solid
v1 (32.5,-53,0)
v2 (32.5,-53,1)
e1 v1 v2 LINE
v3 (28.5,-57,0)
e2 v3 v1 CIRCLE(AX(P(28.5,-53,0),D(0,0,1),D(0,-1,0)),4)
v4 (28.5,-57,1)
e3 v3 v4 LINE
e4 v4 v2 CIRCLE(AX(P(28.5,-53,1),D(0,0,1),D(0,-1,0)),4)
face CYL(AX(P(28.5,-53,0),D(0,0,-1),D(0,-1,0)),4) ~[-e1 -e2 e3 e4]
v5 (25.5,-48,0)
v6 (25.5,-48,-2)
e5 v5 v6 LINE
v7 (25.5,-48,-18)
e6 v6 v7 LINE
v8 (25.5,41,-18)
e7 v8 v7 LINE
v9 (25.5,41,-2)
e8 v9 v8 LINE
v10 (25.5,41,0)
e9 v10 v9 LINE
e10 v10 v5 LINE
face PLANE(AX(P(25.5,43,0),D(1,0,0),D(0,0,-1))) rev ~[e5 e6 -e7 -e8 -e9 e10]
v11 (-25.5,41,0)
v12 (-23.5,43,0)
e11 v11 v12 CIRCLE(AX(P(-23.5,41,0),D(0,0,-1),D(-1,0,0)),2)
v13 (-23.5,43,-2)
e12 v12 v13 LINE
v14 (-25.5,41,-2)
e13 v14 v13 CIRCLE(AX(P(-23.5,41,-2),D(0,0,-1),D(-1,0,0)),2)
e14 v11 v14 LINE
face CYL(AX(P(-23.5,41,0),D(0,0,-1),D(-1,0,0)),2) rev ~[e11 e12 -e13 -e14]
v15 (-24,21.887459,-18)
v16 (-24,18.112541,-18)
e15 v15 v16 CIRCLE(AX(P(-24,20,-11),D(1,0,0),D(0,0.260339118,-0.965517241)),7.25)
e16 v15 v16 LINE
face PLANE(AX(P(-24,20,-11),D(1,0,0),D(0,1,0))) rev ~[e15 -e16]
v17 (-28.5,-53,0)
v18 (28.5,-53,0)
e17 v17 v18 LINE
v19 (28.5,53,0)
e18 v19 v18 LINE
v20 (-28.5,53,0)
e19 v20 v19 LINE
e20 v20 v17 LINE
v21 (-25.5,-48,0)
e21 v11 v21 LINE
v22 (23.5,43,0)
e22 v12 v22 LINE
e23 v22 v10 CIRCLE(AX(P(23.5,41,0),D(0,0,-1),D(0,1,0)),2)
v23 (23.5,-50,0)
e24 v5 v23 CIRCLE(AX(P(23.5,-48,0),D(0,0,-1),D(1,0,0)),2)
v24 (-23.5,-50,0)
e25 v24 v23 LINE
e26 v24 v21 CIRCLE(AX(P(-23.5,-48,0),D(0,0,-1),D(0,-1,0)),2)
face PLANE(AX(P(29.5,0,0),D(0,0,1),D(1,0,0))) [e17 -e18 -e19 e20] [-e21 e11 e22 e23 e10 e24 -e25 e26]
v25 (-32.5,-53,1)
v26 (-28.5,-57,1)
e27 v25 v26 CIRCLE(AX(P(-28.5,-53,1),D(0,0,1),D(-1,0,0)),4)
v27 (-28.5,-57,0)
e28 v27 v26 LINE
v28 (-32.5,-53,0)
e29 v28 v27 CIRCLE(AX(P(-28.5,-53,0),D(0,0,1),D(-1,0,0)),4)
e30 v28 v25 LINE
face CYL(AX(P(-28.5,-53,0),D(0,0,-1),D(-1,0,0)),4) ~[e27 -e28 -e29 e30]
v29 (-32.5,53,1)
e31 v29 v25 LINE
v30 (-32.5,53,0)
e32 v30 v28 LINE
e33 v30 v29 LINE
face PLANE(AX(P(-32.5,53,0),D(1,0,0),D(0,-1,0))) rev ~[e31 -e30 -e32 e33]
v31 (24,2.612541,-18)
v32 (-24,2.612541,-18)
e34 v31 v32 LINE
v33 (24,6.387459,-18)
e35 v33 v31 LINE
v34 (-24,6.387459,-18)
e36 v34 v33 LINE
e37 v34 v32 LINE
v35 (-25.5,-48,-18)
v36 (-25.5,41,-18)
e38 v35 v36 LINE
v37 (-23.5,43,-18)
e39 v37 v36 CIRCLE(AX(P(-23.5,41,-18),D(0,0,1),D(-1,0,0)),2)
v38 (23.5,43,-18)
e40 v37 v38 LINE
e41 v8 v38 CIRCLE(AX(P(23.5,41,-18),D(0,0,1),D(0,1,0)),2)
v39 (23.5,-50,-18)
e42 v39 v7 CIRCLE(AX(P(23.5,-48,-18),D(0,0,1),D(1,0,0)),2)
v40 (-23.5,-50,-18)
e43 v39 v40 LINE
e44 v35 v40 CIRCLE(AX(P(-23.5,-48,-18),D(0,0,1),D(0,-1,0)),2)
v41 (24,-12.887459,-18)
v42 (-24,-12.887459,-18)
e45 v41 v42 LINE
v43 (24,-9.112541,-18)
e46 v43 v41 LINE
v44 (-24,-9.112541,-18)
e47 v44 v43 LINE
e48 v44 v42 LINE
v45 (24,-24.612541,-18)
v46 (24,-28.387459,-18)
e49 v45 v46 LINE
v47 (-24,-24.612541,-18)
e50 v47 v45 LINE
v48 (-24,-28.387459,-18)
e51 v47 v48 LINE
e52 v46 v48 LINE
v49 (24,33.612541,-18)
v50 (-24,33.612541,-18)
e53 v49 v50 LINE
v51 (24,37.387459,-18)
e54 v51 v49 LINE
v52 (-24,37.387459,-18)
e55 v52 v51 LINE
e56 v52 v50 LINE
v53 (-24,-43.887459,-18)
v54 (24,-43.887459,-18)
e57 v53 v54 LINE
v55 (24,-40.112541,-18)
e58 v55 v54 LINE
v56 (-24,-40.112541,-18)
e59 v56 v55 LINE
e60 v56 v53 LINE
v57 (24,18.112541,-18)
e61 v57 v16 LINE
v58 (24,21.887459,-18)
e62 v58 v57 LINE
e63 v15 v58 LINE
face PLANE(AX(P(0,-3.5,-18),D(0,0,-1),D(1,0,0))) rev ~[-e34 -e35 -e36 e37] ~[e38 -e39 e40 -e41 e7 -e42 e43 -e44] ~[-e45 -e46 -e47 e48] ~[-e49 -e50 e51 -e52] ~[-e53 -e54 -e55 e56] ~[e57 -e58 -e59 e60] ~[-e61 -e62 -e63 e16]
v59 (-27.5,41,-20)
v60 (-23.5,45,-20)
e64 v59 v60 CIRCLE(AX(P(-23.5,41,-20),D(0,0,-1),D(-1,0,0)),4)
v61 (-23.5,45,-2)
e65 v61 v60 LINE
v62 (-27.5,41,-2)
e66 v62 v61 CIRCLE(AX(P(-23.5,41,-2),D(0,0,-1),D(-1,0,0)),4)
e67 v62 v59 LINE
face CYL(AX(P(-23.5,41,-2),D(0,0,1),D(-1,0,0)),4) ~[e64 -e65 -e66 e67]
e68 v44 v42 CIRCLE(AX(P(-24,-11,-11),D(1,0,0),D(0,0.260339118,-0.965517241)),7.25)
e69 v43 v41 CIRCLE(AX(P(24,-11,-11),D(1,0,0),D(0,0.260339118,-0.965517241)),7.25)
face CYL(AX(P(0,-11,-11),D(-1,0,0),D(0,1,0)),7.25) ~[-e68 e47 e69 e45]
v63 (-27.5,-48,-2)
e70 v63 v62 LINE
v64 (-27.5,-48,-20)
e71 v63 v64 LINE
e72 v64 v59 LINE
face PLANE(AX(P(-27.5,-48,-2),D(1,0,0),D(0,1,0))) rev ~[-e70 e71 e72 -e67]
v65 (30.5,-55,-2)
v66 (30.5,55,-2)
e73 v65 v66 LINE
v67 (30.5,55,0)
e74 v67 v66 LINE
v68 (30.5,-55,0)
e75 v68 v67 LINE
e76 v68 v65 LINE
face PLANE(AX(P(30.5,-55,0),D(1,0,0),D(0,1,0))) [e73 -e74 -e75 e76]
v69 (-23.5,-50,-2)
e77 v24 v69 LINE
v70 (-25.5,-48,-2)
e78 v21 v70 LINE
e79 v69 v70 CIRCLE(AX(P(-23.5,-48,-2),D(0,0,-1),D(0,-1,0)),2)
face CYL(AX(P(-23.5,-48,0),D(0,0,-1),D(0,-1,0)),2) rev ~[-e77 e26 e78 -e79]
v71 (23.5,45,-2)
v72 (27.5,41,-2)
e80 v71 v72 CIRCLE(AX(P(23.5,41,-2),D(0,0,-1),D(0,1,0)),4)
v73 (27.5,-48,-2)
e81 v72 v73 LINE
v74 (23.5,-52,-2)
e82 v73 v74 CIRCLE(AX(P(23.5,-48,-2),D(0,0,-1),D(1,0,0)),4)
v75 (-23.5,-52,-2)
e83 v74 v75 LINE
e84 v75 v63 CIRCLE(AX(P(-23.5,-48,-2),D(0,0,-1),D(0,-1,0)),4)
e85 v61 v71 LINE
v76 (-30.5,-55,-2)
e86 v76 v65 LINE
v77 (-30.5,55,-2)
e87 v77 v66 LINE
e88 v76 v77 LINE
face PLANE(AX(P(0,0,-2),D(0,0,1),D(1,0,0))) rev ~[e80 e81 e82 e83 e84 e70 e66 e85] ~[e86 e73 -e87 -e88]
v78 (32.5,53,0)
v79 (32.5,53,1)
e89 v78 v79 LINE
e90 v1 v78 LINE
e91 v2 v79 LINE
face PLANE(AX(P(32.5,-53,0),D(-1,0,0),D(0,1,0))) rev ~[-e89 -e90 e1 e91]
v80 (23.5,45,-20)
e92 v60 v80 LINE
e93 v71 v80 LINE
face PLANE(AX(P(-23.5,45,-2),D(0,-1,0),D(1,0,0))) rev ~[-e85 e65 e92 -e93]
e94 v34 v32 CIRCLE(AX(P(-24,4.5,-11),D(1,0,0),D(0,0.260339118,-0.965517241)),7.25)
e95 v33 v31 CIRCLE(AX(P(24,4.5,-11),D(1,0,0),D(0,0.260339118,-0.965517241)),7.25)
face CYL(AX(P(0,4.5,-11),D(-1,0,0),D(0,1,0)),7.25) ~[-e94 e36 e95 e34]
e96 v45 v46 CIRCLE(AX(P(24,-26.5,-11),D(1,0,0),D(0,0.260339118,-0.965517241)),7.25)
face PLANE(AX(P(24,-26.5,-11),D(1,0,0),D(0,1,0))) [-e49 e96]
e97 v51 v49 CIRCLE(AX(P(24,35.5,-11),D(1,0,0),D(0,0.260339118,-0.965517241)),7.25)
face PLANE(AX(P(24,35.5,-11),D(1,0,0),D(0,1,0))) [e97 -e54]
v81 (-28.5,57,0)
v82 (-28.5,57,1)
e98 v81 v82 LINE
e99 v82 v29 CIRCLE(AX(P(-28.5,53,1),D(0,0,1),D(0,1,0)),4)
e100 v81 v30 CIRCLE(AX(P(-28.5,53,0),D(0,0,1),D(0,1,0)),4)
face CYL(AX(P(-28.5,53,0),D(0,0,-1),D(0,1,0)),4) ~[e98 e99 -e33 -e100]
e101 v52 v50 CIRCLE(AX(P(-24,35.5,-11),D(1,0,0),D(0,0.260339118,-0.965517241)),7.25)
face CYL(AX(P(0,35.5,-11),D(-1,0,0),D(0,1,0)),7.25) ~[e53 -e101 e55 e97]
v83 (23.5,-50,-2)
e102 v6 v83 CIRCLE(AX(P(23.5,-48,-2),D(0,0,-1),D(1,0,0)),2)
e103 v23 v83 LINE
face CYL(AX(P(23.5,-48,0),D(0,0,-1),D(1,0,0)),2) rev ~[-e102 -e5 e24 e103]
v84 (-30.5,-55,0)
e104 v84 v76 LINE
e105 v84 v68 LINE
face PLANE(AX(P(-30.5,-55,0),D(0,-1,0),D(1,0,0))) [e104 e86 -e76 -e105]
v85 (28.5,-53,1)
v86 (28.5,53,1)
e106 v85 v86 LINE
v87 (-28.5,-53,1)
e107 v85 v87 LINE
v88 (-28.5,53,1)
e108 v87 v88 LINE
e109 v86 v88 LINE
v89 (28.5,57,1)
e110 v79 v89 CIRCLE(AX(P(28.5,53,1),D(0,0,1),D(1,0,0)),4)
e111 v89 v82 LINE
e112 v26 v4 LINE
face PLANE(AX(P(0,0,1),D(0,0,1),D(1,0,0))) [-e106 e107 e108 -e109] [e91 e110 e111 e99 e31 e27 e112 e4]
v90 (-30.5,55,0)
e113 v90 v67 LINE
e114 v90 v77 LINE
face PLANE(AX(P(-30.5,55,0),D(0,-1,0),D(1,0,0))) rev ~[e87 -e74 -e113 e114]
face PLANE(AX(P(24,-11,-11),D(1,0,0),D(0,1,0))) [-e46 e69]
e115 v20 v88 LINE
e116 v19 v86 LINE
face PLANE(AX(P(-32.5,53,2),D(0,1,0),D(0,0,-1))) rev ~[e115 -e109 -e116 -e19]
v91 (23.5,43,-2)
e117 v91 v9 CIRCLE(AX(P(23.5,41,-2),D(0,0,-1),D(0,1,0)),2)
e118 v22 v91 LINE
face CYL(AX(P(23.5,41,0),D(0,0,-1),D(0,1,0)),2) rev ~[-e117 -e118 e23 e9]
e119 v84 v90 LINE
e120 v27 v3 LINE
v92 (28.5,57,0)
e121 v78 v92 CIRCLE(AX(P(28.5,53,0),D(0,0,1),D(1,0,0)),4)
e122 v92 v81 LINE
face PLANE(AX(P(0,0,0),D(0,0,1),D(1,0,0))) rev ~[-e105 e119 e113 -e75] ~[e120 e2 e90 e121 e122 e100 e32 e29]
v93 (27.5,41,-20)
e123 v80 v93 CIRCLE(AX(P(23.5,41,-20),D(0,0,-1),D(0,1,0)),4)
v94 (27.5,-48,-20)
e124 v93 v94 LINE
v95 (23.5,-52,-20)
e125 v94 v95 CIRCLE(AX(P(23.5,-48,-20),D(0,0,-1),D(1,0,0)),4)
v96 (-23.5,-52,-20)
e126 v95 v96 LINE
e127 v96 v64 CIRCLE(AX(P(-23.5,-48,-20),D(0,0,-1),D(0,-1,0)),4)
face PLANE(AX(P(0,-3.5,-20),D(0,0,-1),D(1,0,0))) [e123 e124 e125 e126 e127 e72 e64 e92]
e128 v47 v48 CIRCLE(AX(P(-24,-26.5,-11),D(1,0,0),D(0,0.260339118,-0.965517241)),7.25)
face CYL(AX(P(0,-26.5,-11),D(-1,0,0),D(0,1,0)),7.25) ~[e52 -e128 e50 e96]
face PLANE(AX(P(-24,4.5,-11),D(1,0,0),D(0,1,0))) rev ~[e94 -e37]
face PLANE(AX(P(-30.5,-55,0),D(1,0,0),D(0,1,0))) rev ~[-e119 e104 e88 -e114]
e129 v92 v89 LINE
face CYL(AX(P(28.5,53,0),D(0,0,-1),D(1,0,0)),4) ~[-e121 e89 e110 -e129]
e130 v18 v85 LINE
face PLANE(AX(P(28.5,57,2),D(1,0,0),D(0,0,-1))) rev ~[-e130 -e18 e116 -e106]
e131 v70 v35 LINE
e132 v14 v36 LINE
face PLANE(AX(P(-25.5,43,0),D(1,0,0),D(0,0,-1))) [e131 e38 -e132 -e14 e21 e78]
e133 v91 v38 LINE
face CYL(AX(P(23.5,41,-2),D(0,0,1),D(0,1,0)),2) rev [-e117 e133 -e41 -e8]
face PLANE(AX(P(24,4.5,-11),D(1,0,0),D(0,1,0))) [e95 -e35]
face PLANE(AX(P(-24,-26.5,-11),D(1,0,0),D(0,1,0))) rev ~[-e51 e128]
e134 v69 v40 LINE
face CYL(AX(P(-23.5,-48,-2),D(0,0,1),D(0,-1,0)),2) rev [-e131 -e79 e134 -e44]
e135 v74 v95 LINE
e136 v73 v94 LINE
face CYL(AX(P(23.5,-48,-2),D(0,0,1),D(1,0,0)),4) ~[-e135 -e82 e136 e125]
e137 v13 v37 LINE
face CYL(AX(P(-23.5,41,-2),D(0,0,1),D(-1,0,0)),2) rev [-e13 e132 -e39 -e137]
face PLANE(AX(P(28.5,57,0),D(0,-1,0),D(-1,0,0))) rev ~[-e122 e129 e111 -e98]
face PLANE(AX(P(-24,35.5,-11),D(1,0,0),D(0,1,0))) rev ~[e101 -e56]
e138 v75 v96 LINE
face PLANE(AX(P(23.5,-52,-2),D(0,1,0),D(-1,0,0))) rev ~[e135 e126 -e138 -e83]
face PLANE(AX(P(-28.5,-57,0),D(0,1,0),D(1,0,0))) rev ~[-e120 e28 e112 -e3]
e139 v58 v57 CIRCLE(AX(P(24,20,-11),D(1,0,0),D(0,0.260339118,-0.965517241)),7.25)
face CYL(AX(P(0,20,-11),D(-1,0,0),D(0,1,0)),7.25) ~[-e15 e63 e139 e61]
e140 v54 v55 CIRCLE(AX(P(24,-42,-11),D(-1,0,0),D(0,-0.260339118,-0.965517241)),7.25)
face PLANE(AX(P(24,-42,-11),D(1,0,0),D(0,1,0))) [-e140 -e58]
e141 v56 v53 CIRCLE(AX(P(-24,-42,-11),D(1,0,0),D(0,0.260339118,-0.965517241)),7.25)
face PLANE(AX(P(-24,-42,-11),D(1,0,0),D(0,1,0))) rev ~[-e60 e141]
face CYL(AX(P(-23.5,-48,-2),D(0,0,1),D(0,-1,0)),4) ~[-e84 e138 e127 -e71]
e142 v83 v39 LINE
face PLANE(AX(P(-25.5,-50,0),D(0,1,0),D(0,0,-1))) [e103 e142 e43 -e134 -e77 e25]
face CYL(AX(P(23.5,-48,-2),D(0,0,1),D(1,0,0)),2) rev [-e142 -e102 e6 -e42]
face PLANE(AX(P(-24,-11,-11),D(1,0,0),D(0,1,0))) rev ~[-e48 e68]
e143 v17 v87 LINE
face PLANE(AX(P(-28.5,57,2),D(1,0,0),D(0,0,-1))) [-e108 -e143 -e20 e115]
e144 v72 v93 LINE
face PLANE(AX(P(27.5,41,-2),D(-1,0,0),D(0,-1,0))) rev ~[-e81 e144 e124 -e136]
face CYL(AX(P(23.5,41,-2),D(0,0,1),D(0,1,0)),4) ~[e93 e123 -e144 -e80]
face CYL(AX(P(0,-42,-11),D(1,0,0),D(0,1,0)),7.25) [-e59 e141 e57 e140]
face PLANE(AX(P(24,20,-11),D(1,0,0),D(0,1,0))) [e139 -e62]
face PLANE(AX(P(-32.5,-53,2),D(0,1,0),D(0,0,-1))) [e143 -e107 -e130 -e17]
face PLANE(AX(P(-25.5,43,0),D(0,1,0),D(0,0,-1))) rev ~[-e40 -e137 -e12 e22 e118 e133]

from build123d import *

# Parameters (mm, degrees)
F1_DEPTH     = 1
F2_W         = 61
F2_H         = 110
F3_DEPTH     = 2
F5_DEPTH     = 18
F6_T         = 2
F6_T3_DEPTH  = 114
F6_T5_DEPTH  = 65
F6_T7_DEPTH  = 51
F6_T9_DEPTH  = 93
F6_T12_ANGLE = 90.000000001
F6_T14_ANGLE = 90.000000001
F6_T16_ANGLE = 90.000000001
F6_T18_ANGLE = 90.000000001
F7_R         = 7.25
F8_DEPTH     = 24


# Not quite as in the source:
# - a shell that OpenCascade refuses in one call is made with other operations: the cavity is built on its own and cut out


with BuildPart() as f1:
    # F0 (on Top) → F1 (new body)
    with BuildSketch(Plane.XY):
        with BuildLine():
            ThreePointArc((32.5, 53), (31.3284271247, 55.8284271247), (28.5, 57))
            Line((28.5, 57), (-28.5, 57))
            ThreePointArc((-28.5, 57), (-31.3284271247, 55.8284271247), (-32.5, 53))
            Line((-32.5, 53), (-32.5, -53))
            ThreePointArc((-32.5, -53), (-31.3284271247, -55.8284271247), (-28.5, -57))
            Line((-28.5, -57), (28.5, -57))
            ThreePointArc((28.5, -57), (31.3284271247, -55.8284271247), (32.5, -53))
            Line((32.5, -53), (32.5, 53))
        make_face()
    extrude(amount=F1_DEPTH)

    # F2 (on Top) → F3 (join)
    with BuildSketch(Plane.XY):
        Rectangle(F2_W, F2_H)
    extrude(amount=-F3_DEPTH)

    # F4 (on face) → F5 (join)
    with BuildSketch(Plane(origin=(0, 0, -2), x_dir=(1, 0, 0), z_dir=(0, 0, -1))):
        with BuildLine():
            Line((23.5, 52), (-23.5, 52))
            ThreePointArc((-23.5, 52), (-26.3284271247, 50.8284271247), (-27.5, 48))
            Line((-27.5, 48), (-27.5, -41))
            ThreePointArc((-27.5, -41), (-26.3284271247, -43.8284271247), (-23.5, -45))
            Line((-23.5, -45), (23.5, -45))
            ThreePointArc((23.5, -45), (26.3284271247, -43.8284271247), (27.5, -41))
            Line((27.5, -41), (27.5, 48))
            ThreePointArc((27.5, 48), (26.3284271247, 50.8284271247), (23.5, 52))
        make_face()
    extrude(amount=F5_DEPTH)

    # F6: shell of thickness 2, made by hand


with BuildPart() as f6_core1:
    # F6_t2: copy of F1
    add(f1.part)

    # the walls: a layer under each face that stays
    f6_faces = [f6_core1.faces().sort_by_distance(p)[0] for p in [
        (31.3284271247, 55.8284271247, 0.5),
        (32.5, 0, 0.5),
        (0, 57, 0.5),
        (22.34375, -55.5925925926, 0),
        (31.3284271247, -55.8284271247, 0.5),
        (-31.3284271247, 55.8284271247, 0.5),
        (0, -57, 0.5),
        (-32.5, 0, 0.5),
        (-31.3284271247, -55.8284271247, 0.5),
        (30.5, 0, -1),
        (0, 55, -1),
        (-30.5, 0, -1),
        (0, -55, -1),
        (-26.1428571429, 47.1428571429, -2),
        (26.3284271247, 43.8284271247, -11),
        (0, 45, -11),
        (-26.3284271247, 43.8284271247, -11),
        (-27.5, -3.5, -11),
        (-26.3284271247, -50.8284271247, -11),
        (0, -52, -11),
        (26.3284271247, -50.8284271247, -11),
        (27.5, -3.5, -11),
        (0, -3.5, -20),
    ]]
    thicken(f6_faces, amount=-F6_T, mode=Mode.SUBTRACT)

    # F6_s4 → F6_t3 (cut)
    with BuildSketch(Plane.XZ.offset(-57)):
        Polygon((30.52, -0.02), (30.5, 2), (28.5, 2), (28.5, 0), align=None)
        Polygon((-30.52, -0.02), (-30.5, 2), (-28.5, 2), (-28.5, 0), align=None)
    extrude(amount=F6_T3_DEPTH, mode=Mode.SUBTRACT)

    # F6_s6 → F6_t5 (cut)
    with BuildSketch(Plane.YZ.offset(-32.5)):
        Polygon((55.02, -0.02), (55, 2), (53, 2), (53, 0), align=None)
        Polygon((-55.02, -0.02), (-55, 2), (-53, 2), (-53, 0), align=None)
    extrude(amount=F6_T5_DEPTH, mode=Mode.SUBTRACT)

    # F6_s8 → F6_t7 (cut)
    with BuildSketch(Plane.YZ.offset(-25.5)):
        Polygon((45.02, -2.02), (45, 0), (43, 0), (43, -2), align=None)
        Polygon((-52.02, -2.02), (-52, 0), (-50, 0), (-50, -2), align=None)
    extrude(amount=F6_T7_DEPTH, mode=Mode.SUBTRACT)

    # F6_s10 → F6_t9 (cut)
    with BuildSketch(Plane.XZ.offset(-43)):
        Polygon((-27.52, -2.02), (-27.5, 0), (-25.5, 0), (-25.5, -2), align=None)
        Polygon((27.52, -2.02), (27.5, 0), (25.5, 0), (25.5, -2), align=None)
    extrude(amount=F6_T9_DEPTH, mode=Mode.SUBTRACT)

    # F6_s11 → F6_t12 (revolve, cut)
    with BuildSketch(Plane.YZ.offset(23.5)):
        Polygon((45.02, -2.02), (45, 0), (43, 0), (43, -2), align=None)
    revolve(axis=Axis((23.5, 41, -2), (0, 0, -1)), revolution_arc=F6_T12_ANGLE, mode=Mode.SUBTRACT)

    # F6_s13 → F6_t14 (revolve, cut)
    with BuildSketch(Plane.XZ.offset(-41)):
        Polygon((-27.52, -2.02), (-27.5, 0), (-25.5, 0), (-25.5, -2), align=None)
    revolve(axis=Axis((-23.5, 41, -2), (0, 0, -1)), revolution_arc=F6_T14_ANGLE, mode=Mode.SUBTRACT)

    # F6_s15 → F6_t16 (revolve, cut)
    with BuildSketch(Plane.YZ.offset(-23.5)):
        Polygon((-52.02, -2.02), (-52, 0), (-50, 0), (-50, -2), align=None)
    revolve(axis=Axis((-23.5, -48, -2), (0, 0, -1)), revolution_arc=F6_T16_ANGLE, mode=Mode.SUBTRACT)

    # F6_s17 → F6_t18 (revolve, cut)
    with BuildSketch(Plane.XZ.offset(48)):
        Polygon((27.52, -2.02), (27.5, 0), (25.5, 0), (25.5, -2), align=None)
    revolve(axis=Axis((23.5, -48, -2), (0, 0, -1)), revolution_arc=F6_T18_ANGLE, mode=Mode.SUBTRACT)


with BuildPart() as f1_1:
    add(f1.part)

    # what is left inside the walls is the cavity
    f6_cavity = [f6_core1.part.solids().sort_by_distance(p)[0] for p in [
        (0, -17.666667, 0.98),
    ]]
    add(f6_cavity, mode=Mode.SUBTRACT)

    # F7 (on Right) → F8 (join, symmetric)
    with BuildSketch(Plane.YZ):
        with Locations((35.5, -11)):
            Circle(F7_R)
        with Locations((20, -11)):
            Circle(F7_R)
        with Locations((4.5, -11)):
            Circle(F7_R)
        with Locations((-11, -11)):
            Circle(F7_R)
        with Locations((-26.5, -11)):
            Circle(F7_R)
        with Locations((-42, -11)):
            Circle(F7_R)
    extrude(amount=F8_DEPTH, both=True)


solid = f1_1.part
